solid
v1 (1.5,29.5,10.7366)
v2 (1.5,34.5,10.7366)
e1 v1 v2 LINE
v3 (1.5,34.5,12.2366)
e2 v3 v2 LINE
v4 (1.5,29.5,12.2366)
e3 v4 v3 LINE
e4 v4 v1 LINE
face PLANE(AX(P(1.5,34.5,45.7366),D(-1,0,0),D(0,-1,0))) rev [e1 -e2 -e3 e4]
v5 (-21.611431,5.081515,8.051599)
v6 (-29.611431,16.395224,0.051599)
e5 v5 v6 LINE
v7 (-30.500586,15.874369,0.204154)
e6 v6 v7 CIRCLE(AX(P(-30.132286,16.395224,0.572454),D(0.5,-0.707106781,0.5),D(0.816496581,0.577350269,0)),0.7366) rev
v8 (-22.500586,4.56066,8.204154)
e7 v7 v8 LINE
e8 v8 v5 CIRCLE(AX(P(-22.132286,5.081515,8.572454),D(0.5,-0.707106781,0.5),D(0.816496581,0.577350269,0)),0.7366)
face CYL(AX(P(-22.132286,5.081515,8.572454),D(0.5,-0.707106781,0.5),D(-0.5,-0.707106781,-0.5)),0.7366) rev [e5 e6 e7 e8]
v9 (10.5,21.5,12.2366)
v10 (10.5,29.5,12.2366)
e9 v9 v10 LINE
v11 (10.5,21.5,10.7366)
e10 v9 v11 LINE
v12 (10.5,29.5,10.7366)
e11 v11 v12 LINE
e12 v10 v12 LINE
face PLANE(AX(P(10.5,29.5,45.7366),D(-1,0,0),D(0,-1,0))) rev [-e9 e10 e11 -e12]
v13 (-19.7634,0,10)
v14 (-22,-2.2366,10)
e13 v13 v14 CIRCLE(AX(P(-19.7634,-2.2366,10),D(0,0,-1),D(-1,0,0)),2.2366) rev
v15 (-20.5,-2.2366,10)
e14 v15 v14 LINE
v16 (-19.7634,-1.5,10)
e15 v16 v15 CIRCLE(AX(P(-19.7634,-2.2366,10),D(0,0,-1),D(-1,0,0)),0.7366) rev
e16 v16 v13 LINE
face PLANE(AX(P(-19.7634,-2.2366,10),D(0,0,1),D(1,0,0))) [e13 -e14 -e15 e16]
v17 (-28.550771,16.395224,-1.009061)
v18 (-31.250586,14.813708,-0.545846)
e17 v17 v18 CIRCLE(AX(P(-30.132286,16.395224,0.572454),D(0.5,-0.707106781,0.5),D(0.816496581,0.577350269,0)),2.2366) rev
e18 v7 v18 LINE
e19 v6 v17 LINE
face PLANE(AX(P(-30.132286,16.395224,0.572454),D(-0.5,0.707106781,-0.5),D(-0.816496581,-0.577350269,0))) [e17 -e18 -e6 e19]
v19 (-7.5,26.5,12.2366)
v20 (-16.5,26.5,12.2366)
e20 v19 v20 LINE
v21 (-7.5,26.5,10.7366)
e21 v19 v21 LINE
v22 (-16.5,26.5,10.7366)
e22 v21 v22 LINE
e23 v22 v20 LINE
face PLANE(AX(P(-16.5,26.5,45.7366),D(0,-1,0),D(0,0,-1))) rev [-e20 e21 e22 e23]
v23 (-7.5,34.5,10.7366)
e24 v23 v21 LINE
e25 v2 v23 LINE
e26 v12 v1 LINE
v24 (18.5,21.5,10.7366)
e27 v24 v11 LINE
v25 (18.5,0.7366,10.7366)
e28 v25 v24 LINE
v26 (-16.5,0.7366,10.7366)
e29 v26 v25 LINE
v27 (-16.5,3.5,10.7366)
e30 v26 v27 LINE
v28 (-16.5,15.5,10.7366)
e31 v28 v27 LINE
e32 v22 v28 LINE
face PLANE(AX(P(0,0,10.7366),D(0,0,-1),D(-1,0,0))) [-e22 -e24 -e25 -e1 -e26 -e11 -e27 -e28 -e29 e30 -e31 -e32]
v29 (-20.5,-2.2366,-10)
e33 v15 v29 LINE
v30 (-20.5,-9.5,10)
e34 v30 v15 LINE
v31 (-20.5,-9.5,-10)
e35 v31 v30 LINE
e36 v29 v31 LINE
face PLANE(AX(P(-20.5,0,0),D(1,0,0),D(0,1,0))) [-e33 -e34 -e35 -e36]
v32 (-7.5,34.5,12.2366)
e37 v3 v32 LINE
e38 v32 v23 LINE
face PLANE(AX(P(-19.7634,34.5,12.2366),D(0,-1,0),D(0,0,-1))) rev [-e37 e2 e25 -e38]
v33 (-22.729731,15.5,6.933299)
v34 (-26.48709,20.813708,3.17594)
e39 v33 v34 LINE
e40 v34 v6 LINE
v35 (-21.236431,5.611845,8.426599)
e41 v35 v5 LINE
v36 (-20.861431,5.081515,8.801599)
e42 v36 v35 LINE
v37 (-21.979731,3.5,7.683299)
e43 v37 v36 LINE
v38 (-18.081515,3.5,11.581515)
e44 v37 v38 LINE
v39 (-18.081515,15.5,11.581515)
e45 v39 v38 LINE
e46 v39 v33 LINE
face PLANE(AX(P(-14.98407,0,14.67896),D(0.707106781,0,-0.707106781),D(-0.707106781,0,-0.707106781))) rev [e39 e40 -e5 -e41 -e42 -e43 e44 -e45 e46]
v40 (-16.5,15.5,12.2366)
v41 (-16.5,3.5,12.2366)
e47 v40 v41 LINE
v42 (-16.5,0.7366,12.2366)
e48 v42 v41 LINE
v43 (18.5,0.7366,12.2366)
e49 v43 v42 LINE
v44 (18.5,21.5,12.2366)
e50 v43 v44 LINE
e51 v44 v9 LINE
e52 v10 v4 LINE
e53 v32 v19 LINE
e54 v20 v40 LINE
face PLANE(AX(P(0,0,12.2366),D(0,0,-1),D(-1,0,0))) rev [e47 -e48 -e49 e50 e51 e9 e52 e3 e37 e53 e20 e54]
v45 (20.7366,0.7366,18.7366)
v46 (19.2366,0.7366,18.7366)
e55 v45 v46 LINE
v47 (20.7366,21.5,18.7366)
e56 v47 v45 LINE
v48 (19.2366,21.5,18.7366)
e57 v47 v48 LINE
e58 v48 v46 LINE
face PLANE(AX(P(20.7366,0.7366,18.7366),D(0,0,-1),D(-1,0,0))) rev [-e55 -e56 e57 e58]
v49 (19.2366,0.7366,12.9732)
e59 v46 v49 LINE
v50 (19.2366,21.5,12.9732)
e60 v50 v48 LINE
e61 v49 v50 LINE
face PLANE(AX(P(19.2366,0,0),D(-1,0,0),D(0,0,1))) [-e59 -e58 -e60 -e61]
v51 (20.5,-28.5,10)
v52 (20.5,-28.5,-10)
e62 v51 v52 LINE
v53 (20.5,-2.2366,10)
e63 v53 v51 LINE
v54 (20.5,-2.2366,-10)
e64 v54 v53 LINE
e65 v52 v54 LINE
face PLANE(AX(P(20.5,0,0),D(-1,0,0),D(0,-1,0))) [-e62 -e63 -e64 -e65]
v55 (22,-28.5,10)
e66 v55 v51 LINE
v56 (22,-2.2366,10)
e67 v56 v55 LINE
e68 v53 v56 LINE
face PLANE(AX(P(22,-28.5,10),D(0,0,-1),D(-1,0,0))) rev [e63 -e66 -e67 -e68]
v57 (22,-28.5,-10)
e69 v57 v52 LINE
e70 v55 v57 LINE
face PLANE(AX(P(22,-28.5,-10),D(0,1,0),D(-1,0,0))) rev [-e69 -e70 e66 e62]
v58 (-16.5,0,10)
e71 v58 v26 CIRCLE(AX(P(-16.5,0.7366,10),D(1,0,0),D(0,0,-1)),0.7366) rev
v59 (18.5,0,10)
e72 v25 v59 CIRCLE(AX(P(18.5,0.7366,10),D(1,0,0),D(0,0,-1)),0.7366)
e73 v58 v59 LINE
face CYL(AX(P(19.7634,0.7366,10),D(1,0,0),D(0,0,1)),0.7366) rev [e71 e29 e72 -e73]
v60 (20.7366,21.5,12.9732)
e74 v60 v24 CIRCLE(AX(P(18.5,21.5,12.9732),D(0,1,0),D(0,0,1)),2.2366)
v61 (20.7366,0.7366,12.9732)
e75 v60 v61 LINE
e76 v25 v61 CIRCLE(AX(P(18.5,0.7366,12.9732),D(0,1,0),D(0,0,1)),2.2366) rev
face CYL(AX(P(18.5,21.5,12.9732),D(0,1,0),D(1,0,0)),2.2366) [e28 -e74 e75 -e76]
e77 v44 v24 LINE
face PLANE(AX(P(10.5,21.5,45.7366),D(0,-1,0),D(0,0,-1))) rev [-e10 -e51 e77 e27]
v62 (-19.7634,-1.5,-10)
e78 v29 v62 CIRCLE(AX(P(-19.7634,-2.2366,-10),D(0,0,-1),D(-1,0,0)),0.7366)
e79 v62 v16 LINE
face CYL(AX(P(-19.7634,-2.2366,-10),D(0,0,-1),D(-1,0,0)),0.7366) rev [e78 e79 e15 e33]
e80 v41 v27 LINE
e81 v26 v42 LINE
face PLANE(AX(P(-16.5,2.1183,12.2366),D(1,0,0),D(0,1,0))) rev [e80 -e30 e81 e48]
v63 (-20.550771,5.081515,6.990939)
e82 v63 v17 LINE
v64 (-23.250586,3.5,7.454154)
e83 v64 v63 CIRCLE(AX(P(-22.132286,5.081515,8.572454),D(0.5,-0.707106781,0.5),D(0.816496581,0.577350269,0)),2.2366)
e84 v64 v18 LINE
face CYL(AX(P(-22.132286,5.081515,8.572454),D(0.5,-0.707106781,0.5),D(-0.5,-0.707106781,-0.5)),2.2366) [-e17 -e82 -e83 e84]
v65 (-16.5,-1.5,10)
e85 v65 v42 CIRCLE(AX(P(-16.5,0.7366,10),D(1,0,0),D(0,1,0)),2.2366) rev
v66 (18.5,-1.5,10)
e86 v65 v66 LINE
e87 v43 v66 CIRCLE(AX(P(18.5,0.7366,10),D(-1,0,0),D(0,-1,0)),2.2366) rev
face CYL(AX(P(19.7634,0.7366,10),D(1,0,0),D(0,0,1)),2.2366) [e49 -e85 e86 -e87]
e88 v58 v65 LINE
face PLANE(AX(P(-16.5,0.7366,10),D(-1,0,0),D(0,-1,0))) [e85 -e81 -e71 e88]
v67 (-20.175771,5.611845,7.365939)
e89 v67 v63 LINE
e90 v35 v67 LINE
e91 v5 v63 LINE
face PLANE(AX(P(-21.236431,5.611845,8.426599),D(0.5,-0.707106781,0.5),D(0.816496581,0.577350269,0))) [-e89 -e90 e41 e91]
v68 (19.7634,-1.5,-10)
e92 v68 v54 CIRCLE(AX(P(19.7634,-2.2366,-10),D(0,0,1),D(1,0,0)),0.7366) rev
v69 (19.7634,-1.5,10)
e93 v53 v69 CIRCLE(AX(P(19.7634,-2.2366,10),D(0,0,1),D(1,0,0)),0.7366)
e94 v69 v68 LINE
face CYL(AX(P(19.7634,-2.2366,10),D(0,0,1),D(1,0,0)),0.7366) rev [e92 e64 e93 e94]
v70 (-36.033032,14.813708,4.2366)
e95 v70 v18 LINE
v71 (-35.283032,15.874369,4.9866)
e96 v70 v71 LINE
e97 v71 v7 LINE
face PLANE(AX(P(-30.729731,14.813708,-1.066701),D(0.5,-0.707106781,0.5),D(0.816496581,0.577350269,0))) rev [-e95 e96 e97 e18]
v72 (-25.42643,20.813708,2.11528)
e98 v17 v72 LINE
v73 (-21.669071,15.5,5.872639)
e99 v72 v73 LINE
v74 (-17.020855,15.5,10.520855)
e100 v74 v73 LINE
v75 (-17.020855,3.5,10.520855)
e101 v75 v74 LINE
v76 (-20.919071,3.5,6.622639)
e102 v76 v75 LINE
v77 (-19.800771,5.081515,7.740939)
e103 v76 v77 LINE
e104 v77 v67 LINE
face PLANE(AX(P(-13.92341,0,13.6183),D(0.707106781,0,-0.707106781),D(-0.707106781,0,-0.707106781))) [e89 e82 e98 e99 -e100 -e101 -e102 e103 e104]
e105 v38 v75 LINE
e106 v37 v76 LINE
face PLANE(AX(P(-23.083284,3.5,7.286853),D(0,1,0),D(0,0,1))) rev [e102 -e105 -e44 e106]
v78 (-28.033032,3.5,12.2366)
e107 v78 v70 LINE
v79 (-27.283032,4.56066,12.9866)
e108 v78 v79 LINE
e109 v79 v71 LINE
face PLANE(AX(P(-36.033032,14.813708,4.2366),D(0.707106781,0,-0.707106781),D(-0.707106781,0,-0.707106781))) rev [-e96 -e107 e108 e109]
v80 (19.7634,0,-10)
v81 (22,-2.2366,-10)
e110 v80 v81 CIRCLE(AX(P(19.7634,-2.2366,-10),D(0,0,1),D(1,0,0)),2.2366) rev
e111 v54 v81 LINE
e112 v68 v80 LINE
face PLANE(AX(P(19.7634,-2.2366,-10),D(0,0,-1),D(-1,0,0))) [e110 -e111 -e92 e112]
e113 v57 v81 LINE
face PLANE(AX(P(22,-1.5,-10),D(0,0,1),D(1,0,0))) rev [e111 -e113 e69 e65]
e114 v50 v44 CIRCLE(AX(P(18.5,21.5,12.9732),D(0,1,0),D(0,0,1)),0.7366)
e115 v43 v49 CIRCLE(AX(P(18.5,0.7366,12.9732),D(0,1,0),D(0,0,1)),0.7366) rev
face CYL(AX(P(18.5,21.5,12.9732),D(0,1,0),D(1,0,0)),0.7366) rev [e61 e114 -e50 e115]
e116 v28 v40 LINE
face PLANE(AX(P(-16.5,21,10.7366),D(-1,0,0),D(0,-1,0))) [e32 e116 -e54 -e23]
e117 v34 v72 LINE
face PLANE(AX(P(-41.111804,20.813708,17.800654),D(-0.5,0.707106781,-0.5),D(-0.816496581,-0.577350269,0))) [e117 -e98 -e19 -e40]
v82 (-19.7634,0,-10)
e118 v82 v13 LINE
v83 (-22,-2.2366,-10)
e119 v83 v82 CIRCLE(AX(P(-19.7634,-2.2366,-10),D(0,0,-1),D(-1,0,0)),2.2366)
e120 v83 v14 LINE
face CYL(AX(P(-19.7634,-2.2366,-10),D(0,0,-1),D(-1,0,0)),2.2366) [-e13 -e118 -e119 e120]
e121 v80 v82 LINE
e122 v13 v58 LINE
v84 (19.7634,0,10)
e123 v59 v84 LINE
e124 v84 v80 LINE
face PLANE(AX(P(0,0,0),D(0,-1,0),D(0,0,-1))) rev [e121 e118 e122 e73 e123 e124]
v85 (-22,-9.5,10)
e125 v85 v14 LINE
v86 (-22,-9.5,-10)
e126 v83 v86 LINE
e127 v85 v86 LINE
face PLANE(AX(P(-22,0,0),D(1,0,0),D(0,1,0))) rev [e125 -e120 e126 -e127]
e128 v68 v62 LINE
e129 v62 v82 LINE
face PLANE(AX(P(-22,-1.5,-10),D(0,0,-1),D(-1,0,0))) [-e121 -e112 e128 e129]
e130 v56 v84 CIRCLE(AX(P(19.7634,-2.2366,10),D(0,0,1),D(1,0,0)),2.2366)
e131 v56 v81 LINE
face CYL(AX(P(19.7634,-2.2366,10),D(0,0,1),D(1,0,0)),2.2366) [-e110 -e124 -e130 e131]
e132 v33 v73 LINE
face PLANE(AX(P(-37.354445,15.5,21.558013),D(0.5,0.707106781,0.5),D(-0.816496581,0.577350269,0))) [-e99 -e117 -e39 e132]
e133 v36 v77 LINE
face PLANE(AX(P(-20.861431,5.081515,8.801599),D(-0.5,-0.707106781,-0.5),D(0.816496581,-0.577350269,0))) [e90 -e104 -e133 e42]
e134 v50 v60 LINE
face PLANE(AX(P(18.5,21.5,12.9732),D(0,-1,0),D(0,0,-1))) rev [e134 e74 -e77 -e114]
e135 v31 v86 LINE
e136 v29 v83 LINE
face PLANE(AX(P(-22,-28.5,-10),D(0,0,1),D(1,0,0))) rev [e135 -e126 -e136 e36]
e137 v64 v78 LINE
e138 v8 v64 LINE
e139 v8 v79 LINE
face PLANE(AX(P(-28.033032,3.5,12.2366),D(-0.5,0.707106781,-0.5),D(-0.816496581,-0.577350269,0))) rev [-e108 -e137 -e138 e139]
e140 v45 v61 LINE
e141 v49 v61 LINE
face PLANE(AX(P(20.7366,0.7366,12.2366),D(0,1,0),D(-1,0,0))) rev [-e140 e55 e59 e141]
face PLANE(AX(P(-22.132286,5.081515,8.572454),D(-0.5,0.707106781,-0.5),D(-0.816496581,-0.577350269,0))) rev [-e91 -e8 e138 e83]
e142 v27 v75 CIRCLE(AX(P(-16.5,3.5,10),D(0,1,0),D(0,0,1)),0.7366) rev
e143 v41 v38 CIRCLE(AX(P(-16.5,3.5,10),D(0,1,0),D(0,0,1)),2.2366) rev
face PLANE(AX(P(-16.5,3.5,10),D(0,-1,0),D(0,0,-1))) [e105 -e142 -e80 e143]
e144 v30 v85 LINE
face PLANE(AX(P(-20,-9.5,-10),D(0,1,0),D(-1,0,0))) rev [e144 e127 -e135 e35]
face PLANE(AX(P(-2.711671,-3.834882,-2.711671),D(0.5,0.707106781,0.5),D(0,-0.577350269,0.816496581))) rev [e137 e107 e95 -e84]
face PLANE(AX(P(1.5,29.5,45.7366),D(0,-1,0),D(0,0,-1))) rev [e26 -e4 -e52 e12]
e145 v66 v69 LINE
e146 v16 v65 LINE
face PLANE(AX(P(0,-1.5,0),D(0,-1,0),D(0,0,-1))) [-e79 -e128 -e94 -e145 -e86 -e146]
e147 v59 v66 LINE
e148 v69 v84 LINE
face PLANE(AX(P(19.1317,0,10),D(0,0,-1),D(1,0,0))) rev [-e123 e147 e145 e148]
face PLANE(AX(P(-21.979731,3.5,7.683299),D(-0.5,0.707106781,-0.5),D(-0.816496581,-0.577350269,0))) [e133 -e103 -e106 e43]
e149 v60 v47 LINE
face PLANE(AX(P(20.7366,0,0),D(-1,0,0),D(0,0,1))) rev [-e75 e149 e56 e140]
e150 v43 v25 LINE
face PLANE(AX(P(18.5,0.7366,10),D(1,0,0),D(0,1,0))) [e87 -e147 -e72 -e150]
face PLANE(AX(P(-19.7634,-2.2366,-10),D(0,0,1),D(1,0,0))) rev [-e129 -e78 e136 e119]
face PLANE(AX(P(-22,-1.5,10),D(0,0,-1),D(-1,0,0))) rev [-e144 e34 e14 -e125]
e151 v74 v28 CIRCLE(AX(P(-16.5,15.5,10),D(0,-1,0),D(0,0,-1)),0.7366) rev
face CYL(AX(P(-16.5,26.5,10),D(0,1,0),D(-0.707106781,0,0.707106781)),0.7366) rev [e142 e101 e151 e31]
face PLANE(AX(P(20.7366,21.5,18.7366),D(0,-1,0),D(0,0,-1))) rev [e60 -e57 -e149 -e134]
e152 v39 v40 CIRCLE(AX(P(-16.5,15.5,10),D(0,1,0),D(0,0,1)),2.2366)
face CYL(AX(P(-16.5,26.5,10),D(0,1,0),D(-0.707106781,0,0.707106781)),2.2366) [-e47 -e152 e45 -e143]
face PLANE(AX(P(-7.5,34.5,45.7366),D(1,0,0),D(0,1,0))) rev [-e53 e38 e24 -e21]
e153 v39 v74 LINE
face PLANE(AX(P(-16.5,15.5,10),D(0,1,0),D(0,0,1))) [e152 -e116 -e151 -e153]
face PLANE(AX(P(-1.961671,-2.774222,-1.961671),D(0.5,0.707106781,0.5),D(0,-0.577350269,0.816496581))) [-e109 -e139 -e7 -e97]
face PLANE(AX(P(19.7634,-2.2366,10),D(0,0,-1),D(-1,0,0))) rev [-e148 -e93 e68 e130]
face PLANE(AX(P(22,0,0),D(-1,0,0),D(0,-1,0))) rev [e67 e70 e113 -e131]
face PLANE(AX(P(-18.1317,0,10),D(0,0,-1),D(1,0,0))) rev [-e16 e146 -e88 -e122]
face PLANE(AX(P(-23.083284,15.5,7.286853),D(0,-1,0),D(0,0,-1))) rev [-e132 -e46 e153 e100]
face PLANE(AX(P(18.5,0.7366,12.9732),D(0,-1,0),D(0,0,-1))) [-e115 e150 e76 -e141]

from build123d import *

# Parameters (mm, degrees)
CROQUIS2_W                         = 44
CROQUIS2_H                         = 20
BRIDA_BASE1_DEPTH                  = 1.5
BRIDA_DE_ARISTA1_STRIP_W           = 7.4732
BRIDA_DE_ARISTA1_STRIP_H           = 1.5
BRIDA_DE_ARISTA1_STRIP_CUT_DEPTH   = 20
BRIDA_DE_ARISTA1_STRIP_2_W         = 7.4732
BRIDA_DE_ARISTA1_STRIP_2_H         = 1.5
BRIDA_DE_ARISTA1_STRIP_CUT_2_DEPTH = 20
BRIDA_DE_ARISTA1_DEPTH             = 20
BRIDA_DE_ARISTA1_BEND_DEPTH        = 20
CROQUIS13_W                        = 20
CROQUIS13_H                        = 19
CORTAR_EXTRUIR1_DEPTH              = 2
BRIDA_DE_ARISTA2_DEPTH             = 39.5268
CORTAR_EXTRUIR2_START              = -22.2366
CORTAR_EXTRUIR2_OUTLINE_W          = 3.2634
CORTAR_EXTRUIR2_OUTLINE_H          = 39
CORTAR_EXTRUIR2_OUTLINE_W_2        = 1.2634
CORTAR_EXTRUIR2_DEPTH              = 2.2366
CROQUIS38_W                        = 9
CROQUIS38_H                        = 8
CORTAR_EXTRUIR3_DEPTH              = 35
BRIDA_DE_ARISTA3_DEPTH             = 20.7634
BRIDA_DE_ARISTA6_DEPTH             = 25.7634
CROQUIS51_W                        = 6.573569946
CROQUIS51_H                        = 2.7634
CROQUIS51_H_2                      = 11
CORTAR_EXTRUIR4_DEPTH              = 2
SALIENTE_EXTRUIR1_DEPTH            = 1.5
CORTAR_EXTRUIR5_DEPTH              = 51.641612746
CORTAR_EXTRUIR5_DEPTH_BACK         = 51.641612746
CROQUIS53_W                        = 1.581515027
CROQUIS53_H                        = 11
CROQUIS53_H_2                      = 2.7634
BRIDA_DE_ARISTA7_STRIP_W           = 7.4732
BRIDA_DE_ARISTA7_STRIP_H           = 1.5
BRIDA_DE_ARISTA7_STRIP_CUT_DEPTH   = 16
BRIDA_DE_ARISTA7_RELIEF_W          = 8.2232
BRIDA_DE_ARISTA7_RELIEF_H          = 0.75
BRIDA_DE_ARISTA7_RELIEF_CUT_DEPTH  = 1.5
BRIDA_DE_ARISTA7_DEPTH             = 16


# Read off the part's stored shape, not the designer's step: Cortar-Extruir2
# Sheet-metal steps are written as plain solids
with BuildPart() as part:
    # Croquis2 → Brida base1 (new body)
    with BuildSketch(Plane(origin=(0, 0, 0), x_dir=(1, 0, 0), z_dir=(0, 1, 0))):
        Rectangle(CROQUIS2_W, CROQUIS2_H)
    extrude(amount=-BRIDA_BASE1_DEPTH)

    # Brida de arista1 strip (across the edge) → Brida de arista1 strip cut (cut)
    with BuildSketch(Plane(origin=(-22, -1.5, 10), x_dir=(1, 0, 0), z_dir=(0, 0, -1))):
        with Locations((-1.5, -0.75)):
            Rectangle(BRIDA_DE_ARISTA1_STRIP_W, BRIDA_DE_ARISTA1_STRIP_H)
    extrude(amount=BRIDA_DE_ARISTA1_STRIP_CUT_DEPTH, mode=Mode.SUBTRACT)

    # Brida de arista1 strip 2 (across the edge) → Brida de arista1 strip cut 2 (cut)
    with BuildSketch(Plane(origin=(22, -1.5, -10), x_dir=(-1, 0, 0), z_dir=(0, 0, 1))):
        with Locations((-1.5, -0.75)):
            Rectangle(BRIDA_DE_ARISTA1_STRIP_2_W, BRIDA_DE_ARISTA1_STRIP_2_H)
    extrude(amount=BRIDA_DE_ARISTA1_STRIP_CUT_2_DEPTH, mode=Mode.SUBTRACT)

    # Brida de arista1 section (across the edge) → Brida de arista1 (add)
    with BuildSketch(Plane(origin=(-22, -1.5, 10), x_dir=(1, 0, 0), z_dir=(0, 0, -1))):
        with BuildLine():
            Line((0, 0.7366), (0, 27))
            Line((0, 27), (1.5, 27))
            Line((1.5, 27), (1.5, 0.7366))
            ThreePointArc((1.5, 0.7366), (1.715745145, 0.215745145), (2.2366, 0))
            Line((2.2366, 0), (2.2366, -1.5))
            ThreePointArc((2.2366, -1.5), (0.655084973, -0.844915027), (0, 0.7366))
        make_face()
    extrude(amount=BRIDA_DE_ARISTA1_DEPTH)

    # Brida de arista1 section 2 (across the edge) → Brida de arista1 bend (add)
    with BuildSketch(Plane(origin=(22, -1.5, -10), x_dir=(-1, 0, 0), z_dir=(0, 0, 1))):
        with BuildLine():
            Line((0, 0.7366), (0, 27))
            Line((0, 27), (1.5, 27))
            Line((1.5, 27), (1.5, 0.7366))
            ThreePointArc((1.5, 0.7366), (1.715745145, 0.215745145), (2.2366, 0))
            Line((2.2366, 0), (2.2366, -1.5))
            ThreePointArc((2.2366, -1.5), (0.655084973, -0.844915027), (0, 0.7366))
        make_face()
    extrude(amount=BRIDA_DE_ARISTA1_BEND_DEPTH)

    # Croquis13 → Cortar-Extruir1 (cut)
    with BuildSketch(Plane.ZY.offset(22)):
        with Locations((0, -19)):
            Rectangle(CROQUIS13_W, CROQUIS13_H)
    extrude(amount=-CORTAR_EXTRUIR1_DEPTH, mode=Mode.SUBTRACT)

    # Brida de arista2 section (across the edge) → Brida de arista2 (add)
    with BuildSketch(Plane(origin=(-19.7634, 0, 10.7366), x_dir=(0, 0, -1), z_dir=(1, 0, 0))):
        with BuildLine():
            Line((-1.5, 0.7366), (-1.5, 34.5))
            Line((-1.5, 34.5), (0, 34.5))
            Line((0, 34.5), (0, 0.7366))
            ThreePointArc((0, 0.7366), (0.215745145, 0.215745145), (0.7366, 0))
            Line((0.7366, 0), (0.7366, -1.5))
            ThreePointArc((0.7366, -1.5), (-0.844915027, -0.844915027), (-1.5, 0.7366))
        make_face()
    extrude(amount=BRIDA_DE_ARISTA2_DEPTH)

    # Cortar-Extruir2 outline → Cortar-Extruir2 (cut)
    with BuildSketch(Plane(origin=(0, 0, -10), x_dir=(-1, 0, 0), z_dir=(0, 0, -1)).offset(CORTAR_EXTRUIR2_START)):
        with Locations((18.1317, 16.5)):
            Rectangle(CORTAR_EXTRUIR2_OUTLINE_W, CORTAR_EXTRUIR2_OUTLINE_H)
        with Locations((-19.1317, 16.5)):
            Rectangle(CORTAR_EXTRUIR2_OUTLINE_W_2, CORTAR_EXTRUIR2_OUTLINE_H)
    extrude(amount=CORTAR_EXTRUIR2_DEPTH, mode=Mode.SUBTRACT)

    # Croquis38 → Cortar-Extruir3 (cut)
    with BuildSketch(Plane(origin=(0, 0, 10.7366), x_dir=(-1, 0, 0), z_dir=(0, 0, -1))):
        with Locations((12, 30.5)):
            Rectangle(CROQUIS38_W, CROQUIS38_H)
        Polygon((-1.5, 34.5), (-10.5, 34.5), (-18.5, 34.5), (-18.5, 21.5), (-10.5, 21.5), (-10.5, 29.5), (-1.5, 29.5), align=None)
    extrude(amount=-CORTAR_EXTRUIR3_DEPTH, mode=Mode.SUBTRACT)

    # Brida de arista3 section (across the edge) → Brida de arista3 (add)
    with BuildSketch(Plane(origin=(19.2366, 0.7366, 12.2366), x_dir=(-1, 0, 0), z_dir=(0, 1, 0))):
        with BuildLine():
            Line((-1.5, 0.7366), (-1.5, 6.5))
            Line((-1.5, 6.5), (0, 6.5))
            Line((0, 6.5), (0, 0.7366))
            ThreePointArc((0, 0.7366), (0.215745145, 0.215745145), (0.7366, 0))
            Line((0.7366, 0), (0.7366, -1.5))
            ThreePointArc((0.7366, -1.5), (-0.844915027, -0.844915027), (-1.5, 0.7366))
        make_face()
    extrude(amount=BRIDA_DE_ARISTA3_DEPTH)

    # Brida de arista6 section (across the edge) → Brida de arista6 (add)
    with BuildSketch(Plane(origin=(-16.80510971, 0.7366, 10.7366), x_dir=(0.7071067811865438, 0, -0.7071067811865512), z_dir=(0, 1, 0))):
        with BuildLine():
            Line((-1.5, 0.30510971), (-1.5, 6.878679656))
            Line((-1.5, 6.878679656), (0, 6.878679656))
            Line((0, 6.878679656), (0, 0.30510971))
            ThreePointArc((0, 0.30510971), (0.056070336, 0.023225094), (0.215745145, -0.215745145))
            Line((0.215745145, -0.215745145), (-0.844915027, -1.276405317))
            ThreePointArc((-0.844915027, -1.276405317), (-1.329748962, -0.550800055), (-1.5, 0.30510971))
        make_face()
    extrude(amount=BRIDA_DE_ARISTA6_DEPTH)

    # Croquis51 → Cortar-Extruir4 (cut)
    with BuildSketch(Plane(origin=(-13.770854855, 0, 13.770854855), x_dir=(-0.7071067811865513, 0, -0.7071067811865438), z_dir=(0.7071067811865438, 0, -0.7071067811865513))):
        with Locations((7.882979051, 2.1183)):
            Rectangle(CROQUIS51_W, CROQUIS51_H)
        with Locations((7.882979051, 21)):
            Rectangle(CROQUIS51_W, CROQUIS51_H_2)
    extrude(amount=-CORTAR_EXTRUIR4_DEPTH, mode=Mode.SUBTRACT)

    # Croquis52 → Saliente-Extruir1 (add)
    with BuildSketch(Plane(origin=(-13.770854855, 0, 13.770854855), x_dir=(-0.7071067811865513, 0, -0.7071067811865438), z_dir=(0.7071067811865438, 0, -0.7071067811865513))):
        Polygon((11.169764024, 15.5), (16.483472523, 20.813708499), (22.483472523, 14.813708499), (11.169764024, 3.5), align=None)
    extrude(amount=-SALIENTE_EXTRUIR1_DEPTH)

    # Croquis53 → Cortar-Extruir5 (cut, two sides: drawn at the far end of the back side and taken through both)
    with BuildSketch(Plane(origin=(0, 0, 10.7366), x_dir=(-1, 0, 0), z_dir=(0, 0, -1)).offset(-CORTAR_EXTRUIR5_DEPTH_BACK)):
        with Locations((17.290757514, 21)):
            Rectangle(CROQUIS53_W, CROQUIS53_H)
        with Locations((17.290757514, 2.1183)):
            Rectangle(CROQUIS53_W, CROQUIS53_H_2)
    extrude(amount=CORTAR_EXTRUIR5_DEPTH + CORTAR_EXTRUIR5_DEPTH_BACK, mode=Mode.SUBTRACT)

    # Brida de arista7 strip (across the edge) → Brida de arista7 strip cut (cut)
    with BuildSketch(Plane(origin=(-30.729730913, 14.813708499, -1.066700859), x_dir=(0.5000000000000012, 0.7071067811865457, 0.5000000000000013), z_dir=(0.5000000000000016, -0.7071067811865495, 0.49999999999999595))):
        with Locations((-1.5, -0.75)):
            Rectangle(BRIDA_DE_ARISTA7_STRIP_W, BRIDA_DE_ARISTA7_STRIP_H)
    extrude(amount=BRIDA_DE_ARISTA7_STRIP_CUT_DEPTH, mode=Mode.SUBTRACT)

    # Brida de arista7 relief (on the sheet) → Brida de arista7 relief cut (cut)
    with BuildSketch(Plane(origin=(-29.611430913, 16.395223526, 0.051599141), x_dir=(0.4999999999999988, 0.7071067811865457, 0.5000000000000038), z_dir=(-0.7071067811865475, -5.355429995107666e-15, 0.7071067811865478))):
        with Locations((-3.3616, -16.375)):
            Rectangle(BRIDA_DE_ARISTA7_RELIEF_W, BRIDA_DE_ARISTA7_RELIEF_H)
    extrude(amount=-BRIDA_DE_ARISTA7_RELIEF_CUT_DEPTH, mode=Mode.SUBTRACT)

    # Brida de arista7 section (across the edge) → Brida de arista7 (add)
    with BuildSketch(Plane(origin=(-30.729730913, 14.813708499, -1.066700859), x_dir=(0.5000000000000012, 0.7071067811865457, 0.5000000000000013), z_dir=(0.5000000000000016, -0.7071067811865495, 0.49999999999999595))):
        with BuildLine():
            Line((0, 0.7366), (0, 7.5))
            Line((0, 7.5), (1.5, 7.5))
            Line((1.5, 7.5), (1.5, 0.7366))
            ThreePointArc((1.5, 0.7366), (1.715745145, 0.215745145), (2.2366, 0))
            Line((2.2366, 0), (2.2366, -1.5))
            ThreePointArc((2.2366, -1.5), (0.655084973, -0.844915027), (0, 0.7366))
        make_face()
    extrude(amount=BRIDA_DE_ARISTA7_DEPTH)


solid = part.part
